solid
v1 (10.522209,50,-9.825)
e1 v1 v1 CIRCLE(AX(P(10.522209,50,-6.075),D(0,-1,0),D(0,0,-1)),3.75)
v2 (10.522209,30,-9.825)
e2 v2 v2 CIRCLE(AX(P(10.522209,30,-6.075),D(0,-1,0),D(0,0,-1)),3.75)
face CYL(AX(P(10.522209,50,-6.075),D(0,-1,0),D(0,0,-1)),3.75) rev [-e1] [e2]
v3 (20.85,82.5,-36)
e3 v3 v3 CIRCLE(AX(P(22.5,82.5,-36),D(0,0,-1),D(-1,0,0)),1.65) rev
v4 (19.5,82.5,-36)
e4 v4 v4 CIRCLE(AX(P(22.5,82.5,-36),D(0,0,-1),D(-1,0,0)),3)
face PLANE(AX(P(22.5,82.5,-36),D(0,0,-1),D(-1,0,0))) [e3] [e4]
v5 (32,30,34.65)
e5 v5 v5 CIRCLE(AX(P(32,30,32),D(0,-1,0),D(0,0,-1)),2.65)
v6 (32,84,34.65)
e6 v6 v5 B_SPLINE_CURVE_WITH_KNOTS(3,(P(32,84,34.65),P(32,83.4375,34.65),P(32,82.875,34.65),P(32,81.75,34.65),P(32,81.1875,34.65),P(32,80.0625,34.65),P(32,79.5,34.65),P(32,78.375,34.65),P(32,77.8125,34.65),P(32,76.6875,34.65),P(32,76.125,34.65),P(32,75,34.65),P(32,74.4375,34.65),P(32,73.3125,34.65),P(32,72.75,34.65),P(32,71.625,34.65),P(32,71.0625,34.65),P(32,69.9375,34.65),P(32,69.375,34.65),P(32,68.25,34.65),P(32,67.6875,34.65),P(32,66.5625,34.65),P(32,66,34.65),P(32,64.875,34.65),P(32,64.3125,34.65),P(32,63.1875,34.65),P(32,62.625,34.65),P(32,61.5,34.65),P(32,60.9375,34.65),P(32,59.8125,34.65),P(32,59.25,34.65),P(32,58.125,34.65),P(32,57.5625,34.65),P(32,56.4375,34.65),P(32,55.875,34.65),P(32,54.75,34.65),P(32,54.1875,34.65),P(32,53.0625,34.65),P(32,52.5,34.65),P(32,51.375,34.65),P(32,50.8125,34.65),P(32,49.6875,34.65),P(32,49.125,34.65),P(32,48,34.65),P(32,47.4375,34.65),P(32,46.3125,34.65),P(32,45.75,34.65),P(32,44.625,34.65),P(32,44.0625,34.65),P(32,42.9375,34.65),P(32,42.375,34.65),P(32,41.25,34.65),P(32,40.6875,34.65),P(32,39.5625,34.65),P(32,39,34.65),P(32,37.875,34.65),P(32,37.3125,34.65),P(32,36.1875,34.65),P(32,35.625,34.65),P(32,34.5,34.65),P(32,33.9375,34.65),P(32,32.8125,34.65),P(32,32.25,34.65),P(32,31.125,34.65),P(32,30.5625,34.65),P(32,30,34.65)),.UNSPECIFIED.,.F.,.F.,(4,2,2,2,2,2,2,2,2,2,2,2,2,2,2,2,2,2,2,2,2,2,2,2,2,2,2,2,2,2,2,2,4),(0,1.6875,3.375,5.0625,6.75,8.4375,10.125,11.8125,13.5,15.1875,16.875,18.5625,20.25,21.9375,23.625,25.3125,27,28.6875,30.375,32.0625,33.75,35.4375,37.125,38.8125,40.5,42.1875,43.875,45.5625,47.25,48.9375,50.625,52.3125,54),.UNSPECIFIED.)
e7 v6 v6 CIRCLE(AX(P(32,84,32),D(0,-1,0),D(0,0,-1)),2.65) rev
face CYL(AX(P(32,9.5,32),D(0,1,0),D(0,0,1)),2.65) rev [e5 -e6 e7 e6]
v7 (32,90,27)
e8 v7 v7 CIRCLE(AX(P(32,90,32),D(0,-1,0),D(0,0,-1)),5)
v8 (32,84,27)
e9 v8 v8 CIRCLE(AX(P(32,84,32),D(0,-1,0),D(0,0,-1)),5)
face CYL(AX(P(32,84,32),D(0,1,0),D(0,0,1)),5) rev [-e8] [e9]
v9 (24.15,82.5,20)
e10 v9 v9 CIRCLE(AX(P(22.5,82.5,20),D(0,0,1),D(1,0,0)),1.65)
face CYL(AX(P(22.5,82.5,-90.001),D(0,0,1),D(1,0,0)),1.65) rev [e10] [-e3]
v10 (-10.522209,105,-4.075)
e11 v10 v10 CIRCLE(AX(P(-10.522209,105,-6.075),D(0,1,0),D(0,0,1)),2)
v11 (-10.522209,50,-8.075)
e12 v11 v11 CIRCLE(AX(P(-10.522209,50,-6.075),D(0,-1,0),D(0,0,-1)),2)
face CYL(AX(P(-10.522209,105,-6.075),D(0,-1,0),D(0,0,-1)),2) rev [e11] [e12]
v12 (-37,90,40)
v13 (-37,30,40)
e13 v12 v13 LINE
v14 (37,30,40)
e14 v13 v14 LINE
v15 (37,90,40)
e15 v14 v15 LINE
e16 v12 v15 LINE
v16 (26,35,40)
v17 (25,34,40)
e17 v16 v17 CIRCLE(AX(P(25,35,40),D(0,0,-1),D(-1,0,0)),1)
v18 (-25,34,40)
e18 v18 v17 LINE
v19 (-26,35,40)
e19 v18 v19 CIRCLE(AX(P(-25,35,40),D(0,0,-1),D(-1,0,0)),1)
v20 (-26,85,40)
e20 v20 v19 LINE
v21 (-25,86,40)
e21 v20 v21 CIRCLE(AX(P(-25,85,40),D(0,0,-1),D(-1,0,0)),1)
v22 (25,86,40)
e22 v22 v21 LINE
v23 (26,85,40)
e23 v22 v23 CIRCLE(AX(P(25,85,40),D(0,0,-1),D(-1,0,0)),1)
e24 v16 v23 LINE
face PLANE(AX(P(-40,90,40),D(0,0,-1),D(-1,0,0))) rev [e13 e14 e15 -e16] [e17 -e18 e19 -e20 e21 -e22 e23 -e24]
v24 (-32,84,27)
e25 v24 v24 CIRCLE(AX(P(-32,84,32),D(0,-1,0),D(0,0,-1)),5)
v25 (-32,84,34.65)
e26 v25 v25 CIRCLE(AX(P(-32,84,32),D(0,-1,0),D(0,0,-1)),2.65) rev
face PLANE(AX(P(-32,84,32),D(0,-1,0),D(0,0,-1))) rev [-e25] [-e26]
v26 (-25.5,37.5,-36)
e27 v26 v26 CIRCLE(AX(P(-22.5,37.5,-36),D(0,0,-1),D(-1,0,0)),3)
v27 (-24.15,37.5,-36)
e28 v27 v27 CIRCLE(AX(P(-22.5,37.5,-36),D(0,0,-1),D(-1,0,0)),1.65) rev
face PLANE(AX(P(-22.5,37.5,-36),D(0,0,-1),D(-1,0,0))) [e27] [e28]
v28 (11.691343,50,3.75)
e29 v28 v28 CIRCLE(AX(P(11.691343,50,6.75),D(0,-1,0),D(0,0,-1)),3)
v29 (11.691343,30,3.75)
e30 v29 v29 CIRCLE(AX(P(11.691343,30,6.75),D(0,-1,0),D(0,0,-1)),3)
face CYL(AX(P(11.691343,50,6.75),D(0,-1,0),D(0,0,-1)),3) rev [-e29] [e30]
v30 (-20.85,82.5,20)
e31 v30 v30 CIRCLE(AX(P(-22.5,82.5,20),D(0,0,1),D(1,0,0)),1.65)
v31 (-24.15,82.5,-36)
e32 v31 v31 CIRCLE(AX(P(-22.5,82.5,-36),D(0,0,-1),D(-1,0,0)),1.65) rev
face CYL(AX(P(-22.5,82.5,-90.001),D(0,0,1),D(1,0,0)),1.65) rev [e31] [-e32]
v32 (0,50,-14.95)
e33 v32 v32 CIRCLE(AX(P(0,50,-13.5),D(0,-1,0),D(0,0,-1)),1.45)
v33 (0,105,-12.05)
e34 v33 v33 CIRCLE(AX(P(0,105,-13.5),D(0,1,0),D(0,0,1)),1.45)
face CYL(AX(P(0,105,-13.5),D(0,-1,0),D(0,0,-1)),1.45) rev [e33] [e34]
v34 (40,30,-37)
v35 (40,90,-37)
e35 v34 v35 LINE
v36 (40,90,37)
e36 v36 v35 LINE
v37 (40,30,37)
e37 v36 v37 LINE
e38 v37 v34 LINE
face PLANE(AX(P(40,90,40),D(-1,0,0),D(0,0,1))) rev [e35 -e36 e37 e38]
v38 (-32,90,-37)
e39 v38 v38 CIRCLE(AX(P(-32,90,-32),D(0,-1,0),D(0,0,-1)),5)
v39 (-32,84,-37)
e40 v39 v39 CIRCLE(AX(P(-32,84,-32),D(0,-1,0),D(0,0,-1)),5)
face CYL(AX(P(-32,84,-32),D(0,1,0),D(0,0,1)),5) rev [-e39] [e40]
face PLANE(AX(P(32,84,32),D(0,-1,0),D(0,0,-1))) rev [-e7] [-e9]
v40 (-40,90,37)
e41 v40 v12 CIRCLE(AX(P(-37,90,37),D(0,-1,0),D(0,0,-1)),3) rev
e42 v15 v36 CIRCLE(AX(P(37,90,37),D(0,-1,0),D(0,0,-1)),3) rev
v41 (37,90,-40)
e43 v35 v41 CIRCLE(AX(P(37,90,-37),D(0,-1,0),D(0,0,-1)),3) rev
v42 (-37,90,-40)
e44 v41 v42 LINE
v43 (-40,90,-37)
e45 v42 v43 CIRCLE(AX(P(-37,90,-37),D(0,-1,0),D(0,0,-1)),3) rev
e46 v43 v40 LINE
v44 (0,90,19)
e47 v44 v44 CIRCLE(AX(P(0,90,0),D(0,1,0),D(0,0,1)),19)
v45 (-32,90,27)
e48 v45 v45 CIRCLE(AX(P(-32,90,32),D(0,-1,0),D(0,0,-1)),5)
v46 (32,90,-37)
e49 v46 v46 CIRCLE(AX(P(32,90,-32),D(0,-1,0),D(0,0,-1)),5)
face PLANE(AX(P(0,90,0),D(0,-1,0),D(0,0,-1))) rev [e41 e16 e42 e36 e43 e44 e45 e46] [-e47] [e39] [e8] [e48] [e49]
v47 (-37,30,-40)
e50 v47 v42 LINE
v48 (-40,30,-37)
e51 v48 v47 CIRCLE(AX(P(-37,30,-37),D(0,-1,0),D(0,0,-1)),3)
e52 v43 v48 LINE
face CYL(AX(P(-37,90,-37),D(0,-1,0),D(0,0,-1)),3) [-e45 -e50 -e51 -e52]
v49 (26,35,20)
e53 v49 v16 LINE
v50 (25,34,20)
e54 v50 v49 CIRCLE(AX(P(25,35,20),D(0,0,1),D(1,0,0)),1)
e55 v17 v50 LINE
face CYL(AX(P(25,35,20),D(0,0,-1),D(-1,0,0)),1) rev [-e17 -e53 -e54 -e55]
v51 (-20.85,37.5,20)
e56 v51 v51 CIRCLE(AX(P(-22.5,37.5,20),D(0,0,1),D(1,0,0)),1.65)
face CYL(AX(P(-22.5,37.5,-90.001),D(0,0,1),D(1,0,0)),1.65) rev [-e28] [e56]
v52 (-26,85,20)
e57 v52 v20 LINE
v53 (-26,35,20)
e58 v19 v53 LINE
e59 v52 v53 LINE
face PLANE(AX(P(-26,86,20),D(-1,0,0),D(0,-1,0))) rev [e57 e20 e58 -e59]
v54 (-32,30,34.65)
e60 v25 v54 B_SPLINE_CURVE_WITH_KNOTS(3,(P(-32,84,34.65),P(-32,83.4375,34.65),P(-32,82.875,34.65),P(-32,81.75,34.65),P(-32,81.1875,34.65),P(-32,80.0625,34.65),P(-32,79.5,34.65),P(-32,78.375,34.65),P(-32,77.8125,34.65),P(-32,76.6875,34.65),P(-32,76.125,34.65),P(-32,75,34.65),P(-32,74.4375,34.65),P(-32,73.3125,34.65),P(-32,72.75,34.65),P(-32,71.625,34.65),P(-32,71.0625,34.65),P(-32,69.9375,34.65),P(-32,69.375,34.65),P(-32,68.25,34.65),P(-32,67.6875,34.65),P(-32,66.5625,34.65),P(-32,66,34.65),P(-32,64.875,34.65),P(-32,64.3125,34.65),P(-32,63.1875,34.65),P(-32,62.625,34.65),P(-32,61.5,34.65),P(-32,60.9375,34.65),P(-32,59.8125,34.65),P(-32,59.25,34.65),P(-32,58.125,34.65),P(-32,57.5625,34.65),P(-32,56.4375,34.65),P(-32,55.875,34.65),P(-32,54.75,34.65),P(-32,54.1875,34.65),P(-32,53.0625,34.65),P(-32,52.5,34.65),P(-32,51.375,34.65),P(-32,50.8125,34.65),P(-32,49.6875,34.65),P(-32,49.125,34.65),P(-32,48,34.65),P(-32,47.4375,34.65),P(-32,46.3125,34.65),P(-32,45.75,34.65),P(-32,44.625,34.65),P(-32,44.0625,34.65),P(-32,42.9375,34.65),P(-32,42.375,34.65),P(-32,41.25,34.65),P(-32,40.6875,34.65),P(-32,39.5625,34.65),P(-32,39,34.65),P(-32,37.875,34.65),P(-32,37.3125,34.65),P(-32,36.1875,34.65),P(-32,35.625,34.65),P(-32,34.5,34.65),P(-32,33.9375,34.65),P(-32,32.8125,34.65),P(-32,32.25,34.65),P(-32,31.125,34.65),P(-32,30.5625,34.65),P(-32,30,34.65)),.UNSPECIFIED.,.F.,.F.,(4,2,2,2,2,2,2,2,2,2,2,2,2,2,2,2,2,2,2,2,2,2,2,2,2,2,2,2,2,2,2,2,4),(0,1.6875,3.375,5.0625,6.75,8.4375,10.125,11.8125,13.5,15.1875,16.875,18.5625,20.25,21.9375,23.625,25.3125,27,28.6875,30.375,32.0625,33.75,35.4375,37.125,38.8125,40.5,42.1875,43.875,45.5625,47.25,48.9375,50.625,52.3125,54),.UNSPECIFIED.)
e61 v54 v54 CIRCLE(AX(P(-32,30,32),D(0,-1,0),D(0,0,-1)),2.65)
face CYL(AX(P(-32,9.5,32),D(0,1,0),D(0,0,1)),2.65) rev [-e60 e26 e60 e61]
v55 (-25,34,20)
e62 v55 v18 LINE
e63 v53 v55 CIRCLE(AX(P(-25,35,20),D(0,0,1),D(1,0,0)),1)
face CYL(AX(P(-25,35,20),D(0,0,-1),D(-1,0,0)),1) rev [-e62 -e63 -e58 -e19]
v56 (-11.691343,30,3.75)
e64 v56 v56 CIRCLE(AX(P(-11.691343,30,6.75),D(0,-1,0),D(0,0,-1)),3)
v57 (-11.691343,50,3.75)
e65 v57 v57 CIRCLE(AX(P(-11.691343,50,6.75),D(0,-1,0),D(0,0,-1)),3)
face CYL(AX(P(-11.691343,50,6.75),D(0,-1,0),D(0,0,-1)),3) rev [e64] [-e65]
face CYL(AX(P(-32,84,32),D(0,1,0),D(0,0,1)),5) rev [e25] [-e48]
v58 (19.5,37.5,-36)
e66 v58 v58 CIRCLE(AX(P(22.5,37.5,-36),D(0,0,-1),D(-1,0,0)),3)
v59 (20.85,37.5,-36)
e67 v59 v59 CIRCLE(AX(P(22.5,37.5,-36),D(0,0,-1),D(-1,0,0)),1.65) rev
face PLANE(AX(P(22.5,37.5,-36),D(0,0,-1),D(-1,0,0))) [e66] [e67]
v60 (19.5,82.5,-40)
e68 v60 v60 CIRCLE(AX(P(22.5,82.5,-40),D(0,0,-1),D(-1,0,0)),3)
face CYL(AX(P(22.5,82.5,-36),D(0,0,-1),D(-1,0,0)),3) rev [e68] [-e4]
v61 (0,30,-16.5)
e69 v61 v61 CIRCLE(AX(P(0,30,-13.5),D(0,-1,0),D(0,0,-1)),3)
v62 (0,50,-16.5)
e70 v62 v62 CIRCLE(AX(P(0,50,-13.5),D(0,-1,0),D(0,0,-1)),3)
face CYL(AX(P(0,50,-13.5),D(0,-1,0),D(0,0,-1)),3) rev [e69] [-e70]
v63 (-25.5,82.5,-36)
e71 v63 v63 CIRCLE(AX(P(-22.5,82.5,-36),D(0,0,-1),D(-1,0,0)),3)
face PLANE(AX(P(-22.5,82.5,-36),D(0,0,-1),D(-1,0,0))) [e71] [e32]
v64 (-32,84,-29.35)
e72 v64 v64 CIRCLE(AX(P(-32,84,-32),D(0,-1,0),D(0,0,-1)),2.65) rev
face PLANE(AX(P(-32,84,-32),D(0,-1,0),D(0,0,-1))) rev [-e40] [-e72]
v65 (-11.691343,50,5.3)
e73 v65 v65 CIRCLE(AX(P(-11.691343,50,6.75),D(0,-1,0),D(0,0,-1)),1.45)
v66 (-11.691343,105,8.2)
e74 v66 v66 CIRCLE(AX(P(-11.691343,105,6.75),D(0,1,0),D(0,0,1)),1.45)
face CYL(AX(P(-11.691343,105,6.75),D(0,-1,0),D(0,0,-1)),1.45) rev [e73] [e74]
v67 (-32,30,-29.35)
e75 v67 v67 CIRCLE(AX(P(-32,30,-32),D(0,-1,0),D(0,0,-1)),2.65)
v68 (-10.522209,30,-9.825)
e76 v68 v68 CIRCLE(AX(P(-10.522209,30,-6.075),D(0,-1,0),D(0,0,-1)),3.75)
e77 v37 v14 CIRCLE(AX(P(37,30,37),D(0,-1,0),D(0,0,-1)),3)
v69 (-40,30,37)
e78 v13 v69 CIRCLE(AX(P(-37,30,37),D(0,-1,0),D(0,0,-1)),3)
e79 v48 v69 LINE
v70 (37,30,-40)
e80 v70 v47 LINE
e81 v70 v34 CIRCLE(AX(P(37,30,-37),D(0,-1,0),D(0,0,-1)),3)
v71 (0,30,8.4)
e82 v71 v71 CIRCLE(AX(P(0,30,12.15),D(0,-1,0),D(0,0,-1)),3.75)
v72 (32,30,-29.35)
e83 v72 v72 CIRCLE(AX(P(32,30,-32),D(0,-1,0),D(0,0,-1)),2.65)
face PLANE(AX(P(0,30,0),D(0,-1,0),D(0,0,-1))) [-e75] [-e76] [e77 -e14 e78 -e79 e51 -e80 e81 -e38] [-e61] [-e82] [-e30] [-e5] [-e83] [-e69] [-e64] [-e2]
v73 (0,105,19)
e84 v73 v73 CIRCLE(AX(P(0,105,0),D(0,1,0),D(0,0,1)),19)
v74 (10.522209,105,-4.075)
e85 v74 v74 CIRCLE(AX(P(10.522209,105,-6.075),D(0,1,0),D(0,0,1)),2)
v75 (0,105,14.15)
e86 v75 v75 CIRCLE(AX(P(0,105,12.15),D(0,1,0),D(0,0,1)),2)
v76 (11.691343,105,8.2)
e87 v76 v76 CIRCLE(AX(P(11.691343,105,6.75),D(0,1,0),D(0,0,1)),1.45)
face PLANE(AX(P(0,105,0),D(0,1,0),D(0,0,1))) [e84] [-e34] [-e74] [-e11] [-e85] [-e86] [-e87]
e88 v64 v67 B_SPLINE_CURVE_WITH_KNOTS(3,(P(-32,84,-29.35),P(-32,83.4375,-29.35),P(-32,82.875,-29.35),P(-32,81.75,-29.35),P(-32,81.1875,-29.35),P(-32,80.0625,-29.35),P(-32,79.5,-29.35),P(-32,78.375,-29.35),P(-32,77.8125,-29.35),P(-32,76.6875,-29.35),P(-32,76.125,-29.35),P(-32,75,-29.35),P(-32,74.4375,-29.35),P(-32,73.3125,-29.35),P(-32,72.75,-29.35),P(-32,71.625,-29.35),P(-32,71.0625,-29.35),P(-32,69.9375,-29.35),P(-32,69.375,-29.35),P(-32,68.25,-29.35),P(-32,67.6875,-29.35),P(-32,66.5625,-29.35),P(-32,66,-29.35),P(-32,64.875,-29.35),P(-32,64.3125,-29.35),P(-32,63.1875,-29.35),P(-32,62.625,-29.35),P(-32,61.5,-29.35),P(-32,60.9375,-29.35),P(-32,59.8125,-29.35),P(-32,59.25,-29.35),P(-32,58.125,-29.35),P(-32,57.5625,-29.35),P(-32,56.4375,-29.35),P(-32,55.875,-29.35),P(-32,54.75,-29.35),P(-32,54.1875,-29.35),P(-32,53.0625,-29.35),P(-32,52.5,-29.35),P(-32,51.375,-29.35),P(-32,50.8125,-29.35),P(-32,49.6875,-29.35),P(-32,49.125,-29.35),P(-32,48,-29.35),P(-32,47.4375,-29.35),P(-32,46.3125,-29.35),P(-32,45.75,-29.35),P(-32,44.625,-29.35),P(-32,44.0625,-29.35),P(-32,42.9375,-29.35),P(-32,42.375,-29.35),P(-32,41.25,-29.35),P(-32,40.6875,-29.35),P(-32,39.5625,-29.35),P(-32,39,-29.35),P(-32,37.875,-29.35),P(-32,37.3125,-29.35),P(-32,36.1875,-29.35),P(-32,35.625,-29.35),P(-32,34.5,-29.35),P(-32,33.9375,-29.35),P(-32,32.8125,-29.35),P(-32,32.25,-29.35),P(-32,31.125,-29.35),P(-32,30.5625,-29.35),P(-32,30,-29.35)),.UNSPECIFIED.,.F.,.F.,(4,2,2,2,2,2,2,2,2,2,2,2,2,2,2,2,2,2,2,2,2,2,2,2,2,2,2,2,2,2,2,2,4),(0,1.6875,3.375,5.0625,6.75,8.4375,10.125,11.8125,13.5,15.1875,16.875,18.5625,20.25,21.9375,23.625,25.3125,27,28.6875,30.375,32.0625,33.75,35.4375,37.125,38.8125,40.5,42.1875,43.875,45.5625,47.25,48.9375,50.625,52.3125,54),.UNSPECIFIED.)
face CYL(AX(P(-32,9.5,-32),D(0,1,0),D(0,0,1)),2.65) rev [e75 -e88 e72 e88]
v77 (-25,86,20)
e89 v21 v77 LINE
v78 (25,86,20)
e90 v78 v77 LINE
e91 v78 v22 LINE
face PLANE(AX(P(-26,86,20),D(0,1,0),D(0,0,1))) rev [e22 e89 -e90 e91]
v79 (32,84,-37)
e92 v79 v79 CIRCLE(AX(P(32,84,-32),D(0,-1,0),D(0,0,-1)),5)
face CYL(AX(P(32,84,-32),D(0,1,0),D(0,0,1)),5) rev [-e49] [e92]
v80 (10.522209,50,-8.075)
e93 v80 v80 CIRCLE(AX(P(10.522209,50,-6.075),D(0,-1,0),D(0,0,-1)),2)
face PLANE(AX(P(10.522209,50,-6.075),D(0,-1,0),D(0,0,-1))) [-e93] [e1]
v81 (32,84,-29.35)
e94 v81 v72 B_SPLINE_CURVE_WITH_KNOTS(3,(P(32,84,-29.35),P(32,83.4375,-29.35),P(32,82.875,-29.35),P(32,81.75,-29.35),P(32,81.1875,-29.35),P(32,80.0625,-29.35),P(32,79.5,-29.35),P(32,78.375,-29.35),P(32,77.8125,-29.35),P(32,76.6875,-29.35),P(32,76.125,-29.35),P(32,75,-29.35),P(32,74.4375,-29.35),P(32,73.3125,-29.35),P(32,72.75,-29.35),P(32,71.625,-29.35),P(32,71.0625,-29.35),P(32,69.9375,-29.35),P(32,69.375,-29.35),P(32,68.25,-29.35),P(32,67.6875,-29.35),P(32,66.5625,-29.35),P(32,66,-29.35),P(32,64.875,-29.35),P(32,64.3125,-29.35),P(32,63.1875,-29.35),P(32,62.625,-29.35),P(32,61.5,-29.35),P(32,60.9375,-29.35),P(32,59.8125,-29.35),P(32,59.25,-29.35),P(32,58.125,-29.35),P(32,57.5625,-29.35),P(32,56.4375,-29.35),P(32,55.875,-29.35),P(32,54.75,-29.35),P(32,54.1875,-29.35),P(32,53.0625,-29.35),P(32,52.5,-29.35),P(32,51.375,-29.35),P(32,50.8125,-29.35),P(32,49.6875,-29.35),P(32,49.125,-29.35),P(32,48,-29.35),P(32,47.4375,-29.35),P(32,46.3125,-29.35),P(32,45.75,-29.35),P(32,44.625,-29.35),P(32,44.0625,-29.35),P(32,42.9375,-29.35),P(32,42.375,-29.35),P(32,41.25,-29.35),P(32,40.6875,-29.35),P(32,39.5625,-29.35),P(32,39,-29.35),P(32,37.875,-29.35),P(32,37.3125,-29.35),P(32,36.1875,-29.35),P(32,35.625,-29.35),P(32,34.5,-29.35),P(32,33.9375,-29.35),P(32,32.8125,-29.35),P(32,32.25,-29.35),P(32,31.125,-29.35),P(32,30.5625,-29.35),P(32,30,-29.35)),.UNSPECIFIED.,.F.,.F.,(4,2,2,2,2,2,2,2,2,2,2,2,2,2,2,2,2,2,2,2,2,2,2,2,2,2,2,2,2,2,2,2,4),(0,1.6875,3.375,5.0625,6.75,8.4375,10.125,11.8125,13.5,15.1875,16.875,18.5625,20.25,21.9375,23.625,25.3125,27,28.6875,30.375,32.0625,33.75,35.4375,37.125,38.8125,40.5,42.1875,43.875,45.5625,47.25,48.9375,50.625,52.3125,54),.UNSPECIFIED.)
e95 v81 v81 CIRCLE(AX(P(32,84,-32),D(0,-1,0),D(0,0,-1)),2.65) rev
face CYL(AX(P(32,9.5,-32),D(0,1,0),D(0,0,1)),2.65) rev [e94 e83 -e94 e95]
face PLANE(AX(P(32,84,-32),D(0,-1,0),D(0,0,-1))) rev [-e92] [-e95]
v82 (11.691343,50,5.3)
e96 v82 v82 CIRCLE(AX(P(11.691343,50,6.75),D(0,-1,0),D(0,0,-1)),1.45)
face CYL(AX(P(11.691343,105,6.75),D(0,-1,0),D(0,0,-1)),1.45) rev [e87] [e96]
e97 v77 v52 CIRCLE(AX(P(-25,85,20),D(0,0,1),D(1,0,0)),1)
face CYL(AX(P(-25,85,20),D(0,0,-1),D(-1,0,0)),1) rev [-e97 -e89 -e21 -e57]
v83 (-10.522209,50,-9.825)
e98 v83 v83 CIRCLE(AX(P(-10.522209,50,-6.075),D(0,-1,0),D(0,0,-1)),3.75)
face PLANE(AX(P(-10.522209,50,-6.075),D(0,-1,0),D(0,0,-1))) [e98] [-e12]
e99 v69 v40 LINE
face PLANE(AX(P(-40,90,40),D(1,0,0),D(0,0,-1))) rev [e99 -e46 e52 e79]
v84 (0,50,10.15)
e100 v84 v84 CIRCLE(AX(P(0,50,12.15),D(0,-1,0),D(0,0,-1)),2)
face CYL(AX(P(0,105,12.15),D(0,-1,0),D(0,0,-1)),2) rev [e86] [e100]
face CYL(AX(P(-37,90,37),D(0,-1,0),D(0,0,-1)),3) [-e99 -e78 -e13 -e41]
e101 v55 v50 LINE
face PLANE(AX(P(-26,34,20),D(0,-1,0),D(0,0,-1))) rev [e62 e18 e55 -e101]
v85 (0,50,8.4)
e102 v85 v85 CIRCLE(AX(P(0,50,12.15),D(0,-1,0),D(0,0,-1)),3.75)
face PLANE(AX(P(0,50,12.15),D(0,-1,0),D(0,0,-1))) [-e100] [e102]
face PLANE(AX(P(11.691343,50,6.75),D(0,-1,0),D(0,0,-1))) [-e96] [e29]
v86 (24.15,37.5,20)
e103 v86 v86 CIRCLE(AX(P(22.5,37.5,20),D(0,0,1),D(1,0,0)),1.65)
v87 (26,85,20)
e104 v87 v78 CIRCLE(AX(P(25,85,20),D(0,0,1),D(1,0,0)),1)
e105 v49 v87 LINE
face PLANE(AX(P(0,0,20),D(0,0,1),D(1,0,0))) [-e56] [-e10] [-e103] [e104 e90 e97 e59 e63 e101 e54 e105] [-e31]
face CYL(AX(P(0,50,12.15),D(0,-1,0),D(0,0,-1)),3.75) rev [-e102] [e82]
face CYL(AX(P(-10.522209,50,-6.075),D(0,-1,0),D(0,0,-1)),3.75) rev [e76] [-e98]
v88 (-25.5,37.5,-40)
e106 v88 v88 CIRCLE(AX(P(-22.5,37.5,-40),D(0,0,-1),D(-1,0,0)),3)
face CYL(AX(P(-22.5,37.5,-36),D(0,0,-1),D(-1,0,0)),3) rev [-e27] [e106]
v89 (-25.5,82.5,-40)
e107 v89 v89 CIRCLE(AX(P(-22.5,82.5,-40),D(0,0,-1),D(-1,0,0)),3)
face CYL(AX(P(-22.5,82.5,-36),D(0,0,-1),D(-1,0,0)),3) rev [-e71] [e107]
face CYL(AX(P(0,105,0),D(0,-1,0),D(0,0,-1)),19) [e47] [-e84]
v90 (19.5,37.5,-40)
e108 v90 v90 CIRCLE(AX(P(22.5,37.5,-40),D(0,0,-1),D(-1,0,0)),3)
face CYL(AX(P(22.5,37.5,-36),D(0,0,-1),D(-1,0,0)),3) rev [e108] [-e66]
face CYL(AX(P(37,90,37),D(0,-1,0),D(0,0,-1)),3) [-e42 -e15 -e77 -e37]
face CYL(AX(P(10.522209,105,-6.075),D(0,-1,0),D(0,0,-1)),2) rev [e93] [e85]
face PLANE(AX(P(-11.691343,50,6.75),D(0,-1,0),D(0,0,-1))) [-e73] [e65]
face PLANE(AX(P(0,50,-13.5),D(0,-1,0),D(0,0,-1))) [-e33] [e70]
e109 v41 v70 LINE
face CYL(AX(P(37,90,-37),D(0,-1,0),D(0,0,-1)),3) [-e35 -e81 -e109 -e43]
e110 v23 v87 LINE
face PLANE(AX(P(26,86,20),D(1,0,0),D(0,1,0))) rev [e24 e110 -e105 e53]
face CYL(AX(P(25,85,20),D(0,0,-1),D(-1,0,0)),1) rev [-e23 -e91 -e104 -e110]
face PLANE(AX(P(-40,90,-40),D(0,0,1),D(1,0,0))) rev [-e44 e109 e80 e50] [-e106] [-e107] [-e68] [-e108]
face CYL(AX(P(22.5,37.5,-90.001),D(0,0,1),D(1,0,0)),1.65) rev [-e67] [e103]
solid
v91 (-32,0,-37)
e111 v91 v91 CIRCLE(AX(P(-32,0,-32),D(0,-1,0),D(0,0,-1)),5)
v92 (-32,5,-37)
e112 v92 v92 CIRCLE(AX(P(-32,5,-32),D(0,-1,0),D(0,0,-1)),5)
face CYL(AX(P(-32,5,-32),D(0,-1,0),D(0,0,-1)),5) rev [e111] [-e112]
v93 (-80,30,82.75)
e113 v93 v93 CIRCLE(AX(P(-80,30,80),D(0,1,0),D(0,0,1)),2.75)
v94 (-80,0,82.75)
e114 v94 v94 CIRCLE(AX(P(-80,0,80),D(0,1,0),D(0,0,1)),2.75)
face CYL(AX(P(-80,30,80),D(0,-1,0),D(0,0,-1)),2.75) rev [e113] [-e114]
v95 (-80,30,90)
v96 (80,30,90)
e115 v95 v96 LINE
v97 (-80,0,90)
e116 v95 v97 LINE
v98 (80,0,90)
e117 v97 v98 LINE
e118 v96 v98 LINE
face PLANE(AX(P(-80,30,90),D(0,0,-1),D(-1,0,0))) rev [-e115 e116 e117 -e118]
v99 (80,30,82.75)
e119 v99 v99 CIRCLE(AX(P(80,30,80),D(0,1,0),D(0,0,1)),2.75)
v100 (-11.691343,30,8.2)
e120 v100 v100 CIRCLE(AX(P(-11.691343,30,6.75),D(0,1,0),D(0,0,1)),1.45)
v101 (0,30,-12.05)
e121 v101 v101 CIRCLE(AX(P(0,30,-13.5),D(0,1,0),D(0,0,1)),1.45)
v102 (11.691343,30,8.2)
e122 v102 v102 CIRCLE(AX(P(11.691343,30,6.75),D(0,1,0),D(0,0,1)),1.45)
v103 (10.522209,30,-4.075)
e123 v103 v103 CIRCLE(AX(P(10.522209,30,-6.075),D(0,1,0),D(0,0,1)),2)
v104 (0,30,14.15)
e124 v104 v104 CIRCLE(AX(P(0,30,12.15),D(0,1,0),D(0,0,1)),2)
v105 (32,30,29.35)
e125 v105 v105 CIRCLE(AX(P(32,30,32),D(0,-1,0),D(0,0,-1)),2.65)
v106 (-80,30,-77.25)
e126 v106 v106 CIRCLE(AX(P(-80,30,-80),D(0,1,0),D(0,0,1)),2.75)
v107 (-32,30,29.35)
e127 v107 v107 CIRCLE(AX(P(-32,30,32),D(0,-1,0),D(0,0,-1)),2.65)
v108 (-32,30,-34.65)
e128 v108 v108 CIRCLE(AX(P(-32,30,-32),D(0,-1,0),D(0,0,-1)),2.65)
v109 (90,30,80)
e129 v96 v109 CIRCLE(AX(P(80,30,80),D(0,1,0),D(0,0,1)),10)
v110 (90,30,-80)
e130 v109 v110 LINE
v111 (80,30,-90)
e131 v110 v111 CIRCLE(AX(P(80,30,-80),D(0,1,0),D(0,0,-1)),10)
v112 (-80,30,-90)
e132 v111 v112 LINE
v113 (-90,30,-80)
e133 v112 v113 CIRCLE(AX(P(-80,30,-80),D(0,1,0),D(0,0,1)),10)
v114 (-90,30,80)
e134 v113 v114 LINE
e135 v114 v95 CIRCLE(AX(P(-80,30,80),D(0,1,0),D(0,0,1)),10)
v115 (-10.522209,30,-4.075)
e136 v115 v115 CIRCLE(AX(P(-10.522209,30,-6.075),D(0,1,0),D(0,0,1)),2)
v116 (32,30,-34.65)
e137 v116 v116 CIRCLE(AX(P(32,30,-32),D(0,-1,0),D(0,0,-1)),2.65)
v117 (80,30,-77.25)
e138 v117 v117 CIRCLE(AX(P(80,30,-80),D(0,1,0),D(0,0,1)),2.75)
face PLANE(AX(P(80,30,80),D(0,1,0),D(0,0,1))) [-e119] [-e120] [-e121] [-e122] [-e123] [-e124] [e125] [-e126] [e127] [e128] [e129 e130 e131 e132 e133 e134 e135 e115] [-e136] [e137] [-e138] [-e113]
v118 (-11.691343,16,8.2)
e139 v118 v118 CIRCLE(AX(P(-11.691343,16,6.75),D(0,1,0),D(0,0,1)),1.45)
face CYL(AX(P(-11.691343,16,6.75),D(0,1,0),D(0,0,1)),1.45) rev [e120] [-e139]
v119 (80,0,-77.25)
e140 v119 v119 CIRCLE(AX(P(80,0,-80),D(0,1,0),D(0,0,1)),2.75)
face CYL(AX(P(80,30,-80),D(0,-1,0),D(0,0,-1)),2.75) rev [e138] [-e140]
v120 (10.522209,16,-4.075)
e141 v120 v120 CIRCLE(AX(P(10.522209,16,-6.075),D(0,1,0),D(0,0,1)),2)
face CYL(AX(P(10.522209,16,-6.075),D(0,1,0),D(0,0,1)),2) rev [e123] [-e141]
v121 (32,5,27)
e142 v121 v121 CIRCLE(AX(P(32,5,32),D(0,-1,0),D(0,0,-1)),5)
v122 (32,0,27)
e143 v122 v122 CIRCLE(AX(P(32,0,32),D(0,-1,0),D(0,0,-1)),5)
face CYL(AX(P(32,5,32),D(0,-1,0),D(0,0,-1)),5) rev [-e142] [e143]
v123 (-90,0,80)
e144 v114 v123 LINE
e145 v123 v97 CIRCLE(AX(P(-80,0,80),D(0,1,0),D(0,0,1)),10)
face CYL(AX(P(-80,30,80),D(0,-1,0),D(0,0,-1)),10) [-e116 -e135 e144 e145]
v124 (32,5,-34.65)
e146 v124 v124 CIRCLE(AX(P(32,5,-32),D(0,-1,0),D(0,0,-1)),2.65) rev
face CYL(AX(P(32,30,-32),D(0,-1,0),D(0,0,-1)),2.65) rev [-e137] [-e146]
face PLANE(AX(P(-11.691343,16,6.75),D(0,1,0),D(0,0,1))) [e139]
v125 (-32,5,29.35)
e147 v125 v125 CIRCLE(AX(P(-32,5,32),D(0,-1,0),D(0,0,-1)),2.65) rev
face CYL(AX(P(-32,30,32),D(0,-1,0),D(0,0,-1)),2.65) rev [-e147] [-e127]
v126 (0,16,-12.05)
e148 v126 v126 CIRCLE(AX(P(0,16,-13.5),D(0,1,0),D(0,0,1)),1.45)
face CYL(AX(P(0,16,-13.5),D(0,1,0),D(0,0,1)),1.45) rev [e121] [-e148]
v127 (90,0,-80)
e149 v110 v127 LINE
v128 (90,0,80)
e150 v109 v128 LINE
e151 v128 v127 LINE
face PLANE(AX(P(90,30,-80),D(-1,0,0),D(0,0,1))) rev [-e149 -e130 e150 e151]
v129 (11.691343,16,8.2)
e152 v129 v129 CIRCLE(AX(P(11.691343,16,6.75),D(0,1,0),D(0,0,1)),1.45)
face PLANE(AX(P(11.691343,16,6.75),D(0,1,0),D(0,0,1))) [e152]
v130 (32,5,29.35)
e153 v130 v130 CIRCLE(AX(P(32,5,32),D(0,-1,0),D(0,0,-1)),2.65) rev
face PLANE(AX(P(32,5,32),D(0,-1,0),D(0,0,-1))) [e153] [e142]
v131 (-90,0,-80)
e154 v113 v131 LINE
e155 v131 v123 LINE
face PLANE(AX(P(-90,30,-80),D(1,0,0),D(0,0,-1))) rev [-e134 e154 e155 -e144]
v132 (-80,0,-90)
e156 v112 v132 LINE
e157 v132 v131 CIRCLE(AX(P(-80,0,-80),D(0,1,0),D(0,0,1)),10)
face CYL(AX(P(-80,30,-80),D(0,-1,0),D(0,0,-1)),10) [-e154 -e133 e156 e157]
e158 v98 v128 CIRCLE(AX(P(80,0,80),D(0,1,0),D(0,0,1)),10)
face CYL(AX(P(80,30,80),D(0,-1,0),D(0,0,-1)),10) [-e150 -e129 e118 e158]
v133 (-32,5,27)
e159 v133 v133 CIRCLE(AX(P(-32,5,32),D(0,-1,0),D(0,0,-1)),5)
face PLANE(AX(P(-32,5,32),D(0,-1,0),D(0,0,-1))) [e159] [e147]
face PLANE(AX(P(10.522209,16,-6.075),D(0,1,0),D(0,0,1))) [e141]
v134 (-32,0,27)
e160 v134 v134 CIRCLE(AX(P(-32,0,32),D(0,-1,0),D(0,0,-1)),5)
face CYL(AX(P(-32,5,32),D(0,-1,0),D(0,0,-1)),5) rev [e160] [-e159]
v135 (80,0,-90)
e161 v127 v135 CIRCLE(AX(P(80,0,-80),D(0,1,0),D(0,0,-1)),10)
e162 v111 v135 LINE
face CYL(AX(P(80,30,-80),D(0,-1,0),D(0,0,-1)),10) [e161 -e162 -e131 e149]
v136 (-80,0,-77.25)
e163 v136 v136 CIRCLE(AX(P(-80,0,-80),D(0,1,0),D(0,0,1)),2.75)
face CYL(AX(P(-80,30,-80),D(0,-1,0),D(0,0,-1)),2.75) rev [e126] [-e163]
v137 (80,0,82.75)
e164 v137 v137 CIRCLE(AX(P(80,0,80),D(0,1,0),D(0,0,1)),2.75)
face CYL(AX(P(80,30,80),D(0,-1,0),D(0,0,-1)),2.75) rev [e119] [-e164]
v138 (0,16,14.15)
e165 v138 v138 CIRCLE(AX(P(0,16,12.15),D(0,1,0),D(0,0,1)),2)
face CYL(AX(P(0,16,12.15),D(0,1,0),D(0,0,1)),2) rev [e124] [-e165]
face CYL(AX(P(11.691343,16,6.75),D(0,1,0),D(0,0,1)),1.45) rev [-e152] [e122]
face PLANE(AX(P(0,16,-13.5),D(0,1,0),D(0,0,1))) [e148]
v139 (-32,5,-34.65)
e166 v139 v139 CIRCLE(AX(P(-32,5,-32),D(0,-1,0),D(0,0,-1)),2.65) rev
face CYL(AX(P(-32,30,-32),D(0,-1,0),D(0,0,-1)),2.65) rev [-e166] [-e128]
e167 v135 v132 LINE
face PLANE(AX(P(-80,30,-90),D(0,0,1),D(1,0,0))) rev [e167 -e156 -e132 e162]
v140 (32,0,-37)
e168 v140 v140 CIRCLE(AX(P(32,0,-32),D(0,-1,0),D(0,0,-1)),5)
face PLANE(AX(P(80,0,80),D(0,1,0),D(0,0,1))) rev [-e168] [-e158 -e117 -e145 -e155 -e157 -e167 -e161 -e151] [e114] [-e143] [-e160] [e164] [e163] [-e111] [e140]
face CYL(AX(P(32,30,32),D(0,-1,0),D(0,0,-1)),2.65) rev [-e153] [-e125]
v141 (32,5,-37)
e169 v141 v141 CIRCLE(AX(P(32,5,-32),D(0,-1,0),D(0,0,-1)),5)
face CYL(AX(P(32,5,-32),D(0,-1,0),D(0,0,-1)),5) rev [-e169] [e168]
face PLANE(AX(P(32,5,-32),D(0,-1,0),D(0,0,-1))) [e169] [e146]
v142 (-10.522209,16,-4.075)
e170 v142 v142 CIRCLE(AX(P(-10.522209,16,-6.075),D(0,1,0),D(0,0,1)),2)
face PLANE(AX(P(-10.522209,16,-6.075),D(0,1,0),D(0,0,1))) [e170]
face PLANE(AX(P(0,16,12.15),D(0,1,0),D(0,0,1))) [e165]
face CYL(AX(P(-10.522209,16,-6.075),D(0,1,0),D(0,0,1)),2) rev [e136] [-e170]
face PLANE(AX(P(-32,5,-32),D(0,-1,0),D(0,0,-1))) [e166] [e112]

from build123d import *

# Parameters (mm, degrees)
SKETCH_1_R            = 2.75
EXTRUDE_1_DEPTH       = 30
SKETCH_2_W            = 80
SKETCH_2_H            = 80
EXTRUDE_2_DEPTH       = 60
EXTRUDE_3_OUTLINE_R   = 19
EXTRUDE_3_OUTLINE_R_2 = 1.45
EXTRUDE_3_OUTLINE_R_3 = 2
EXTRUDE_3_DEPTH       = 15
SKETCH_4_R            = 1.45
SKETCH_4_R_2          = 2
CUT_EXTRUDE_1_DEPTH   = 89
FILLET_1_R            = 3
SKETCH_6_W            = 52
SKETCH_6_H            = 52
CUT_EXTRUDE_3_DEPTH   = 20
CUT_EXTRUDE_START     = -30
SKETCH_5_R            = 3.75
SKETCH_5_R_2          = 3
CUT_EXTRUDE_4_DEPTH   = 20
SKETCH_7_R            = 2.65
CUT_EXTRUDE_5_DEPTH   = 80.5
CUT_EXTRUDE_START_2   = -60
SKETCH_8_R            = 5
CUT_EXTRUDE_7_DEPTH   = 6
FILLET_3_R            = 1
SKETCH_9_R            = 1.65
CUT_EXTRUDE_8_DEPTH   = 60
SKETCH_10_R           = 3
CUT_EXTRUDE_9_DEPTH   = 4
SKETCH_11_R           = 2.65
CUT_EXTRUDE_10_DEPTH  = 30
SKETCH_12_R           = 5
CUT_EXTRUDE_11_DEPTH  = 5


# Read off the part's stored shape, not the designer's step: 凸台-拉伸3
with BuildPart() as part:
    # 草图1 → 凸台-拉伸1 (new body)
    with BuildSketch(Plane(origin=(0, 0, 0), x_dir=(1, 0, 0), z_dir=(0, 1, 0))):
        with BuildLine():
            Line((-80, 90), (80, 90))
            ThreePointArc((80, 90), (87.071067812, 87.071067812), (90, 80))
            Line((90, 80), (90, -80))
            ThreePointArc((90, -80), (87.071067812, -87.071067812), (80, -90))
            Line((80, -90), (-80, -90))
            ThreePointArc((-80, -90), (-87.071067812, -87.071067812), (-90, -80))
            Line((-90, -80), (-90, 80))
            ThreePointArc((-90, 80), (-87.071067812, 87.071067812), (-80, 90))
        make_face()
        with Locations(Location((-80, 80, 0), (0, 0, 270))):
            Circle(SKETCH_1_R, mode=Mode.SUBTRACT)
        with Locations(Location((-80, -80, 0), (0, 0, 270))):
            Circle(SKETCH_1_R, mode=Mode.SUBTRACT)
        with Locations(Location((80, 80, 0), (0, 0, 270))):
            Circle(SKETCH_1_R, mode=Mode.SUBTRACT)
        with Locations(Location((80, -80, 0), (0, 0, 270))):
            Circle(SKETCH_1_R, mode=Mode.SUBTRACT)
    extrude(amount=EXTRUDE_1_DEPTH)


with BuildPart() as body_2:
    # 草图2 → 凸台-拉伸2 (new body)
    with BuildSketch(Plane(origin=(0, 30, 0), x_dir=(1, 0, 0), z_dir=(0, 1, 0))):
        Rectangle(SKETCH_2_W, SKETCH_2_H)
    extrude(amount=EXTRUDE_2_DEPTH)

    # 凸台-拉伸3 outline → 凸台-拉伸3 (add)
    with BuildSketch(Plane(origin=(0, 90, 0), x_dir=(1, 0, 0), z_dir=(0, 1, 0))):
        Circle(EXTRUDE_3_OUTLINE_R)
        with Locations((-11.691342951, -6.75)):
            Circle(EXTRUDE_3_OUTLINE_R_2, mode=Mode.SUBTRACT)
        with Locations((0, -12.15)):
            Circle(EXTRUDE_3_OUTLINE_R_3, mode=Mode.SUBTRACT)
        with Locations((11.691342951, -6.75)):
            Circle(EXTRUDE_3_OUTLINE_R_2, mode=Mode.SUBTRACT)
        with Locations((-10.522208656, 6.075)):
            Circle(EXTRUDE_3_OUTLINE_R_3, mode=Mode.SUBTRACT)
        with Locations((10.522208656, 6.075)):
            Circle(EXTRUDE_3_OUTLINE_R_3, mode=Mode.SUBTRACT)
        with Locations((0, 13.5)):
            Circle(EXTRUDE_3_OUTLINE_R_2, mode=Mode.SUBTRACT)
    extrude(amount=EXTRUDE_3_DEPTH)


with BuildPart() as cut_extrude_1_tool:
    # 草图4 → 切除-拉伸1 (new body)
    with BuildSketch(Plane(origin=(0, 105, 0), x_dir=(1, 0, 0), z_dir=(0, 1, 0))):
        with Locations(Location((-11.691342951, -6.75, 0), (0, 0, 90))):
            Circle(SKETCH_4_R)
        with Locations(Location((0, -12.15, 0), (0, 0, 90))):
            Circle(SKETCH_4_R_2)
        with Locations(Location((11.691342951, -6.75, 0), (0, 0, 90))):
            Circle(SKETCH_4_R)
        with Locations(Location((10.522208656, 6.075, 0), (0, 0, 90))):
            Circle(SKETCH_4_R_2)
        with Locations(Location((-10.522208656, 6.075, 0), (0, 0, 90))):
            Circle(SKETCH_4_R_2)
        with Locations(Location((0, 13.5, 0), (0, 0, 90))):
            Circle(SKETCH_4_R)
    extrude(amount=-CUT_EXTRUDE_1_DEPTH)


with BuildPart() as part_1:
    add(part.part)

    # 切除-拉伸1: cut by cut_extrude_1_tool
    add(cut_extrude_1_tool.part, mode=Mode.SUBTRACT)

    # 草图11 → 切除-拉伸10 (cut)
    with BuildSketch(Plane.XZ):
        with Locations(Location((32, 32, 0), (0, 0, 90))):
            Circle(SKETCH_11_R)
        with Locations(Location((32, -32, 0), (0, 0, 90))):
            Circle(SKETCH_11_R)
        with Locations(Location((-32, -32, 0), (0, 0, 90))):
            Circle(SKETCH_11_R)
        with Locations(Location((-32, 32, 0), (0, 0, 90))):
            Circle(SKETCH_11_R)
    extrude(amount=-CUT_EXTRUDE_10_DEPTH, mode=Mode.SUBTRACT)

    # 草图12 → 切除-拉伸11 (cut)
    with BuildSketch(Plane.XZ):
        with Locations(Location((32, 32, 0), (0, 0, 270))):
            Circle(SKETCH_12_R)
        with Locations(Location((32, -32, 0), (0, 0, 270))):
            Circle(SKETCH_12_R)
        with Locations(Location((-32, -32, 0), (0, 0, 270))):
            Circle(SKETCH_12_R)
        with Locations(Location((-32, 32, 0), (0, 0, 270))):
            Circle(SKETCH_12_R)
    extrude(amount=-CUT_EXTRUDE_11_DEPTH, mode=Mode.SUBTRACT)


with BuildPart() as body_2_1:
    add(body_2.part)

    # 切除-拉伸1: cut by cut_extrude_1_tool
    add(cut_extrude_1_tool.part, mode=Mode.SUBTRACT)

    # 圆角1
    fillet_1_edges = [body_2_1.edges().sort_by_distance(p)[0] for p in [
        (40, 60, 40),
        (-40, 60, 40),
        (-40, 60, -40),
        (40, 60, -40),
    ]]
    fillet(fillet_1_edges, radius=FILLET_1_R)

    # 草图6 → 切除-拉伸3 (cut)
    with BuildSketch(Plane.XY.offset(40)):
        with Locations((0, 60)):
            Rectangle(SKETCH_6_W, SKETCH_6_H)
    extrude(amount=-CUT_EXTRUDE_3_DEPTH, mode=Mode.SUBTRACT)

    # 草图5 → 切除-拉伸4 (cut)
    with BuildSketch(Plane.XZ.offset(CUT_EXTRUDE_START)):
        with Locations(Location((0, 12.15, 0), (0, 0, 270))):
            Circle(SKETCH_5_R)
        with Locations(Location((10.522208656, -6.075, 0), (0, 0, 270))):
            Circle(SKETCH_5_R)
        with Locations(Location((-10.522208656, -6.075, 0), (0, 0, 270))):
            Circle(SKETCH_5_R)
        with Locations(Location((-11.691342951, 6.75, 0), (0, 0, 270))):
            Circle(SKETCH_5_R_2)
        with Locations(Location((11.691342951, 6.75, 0), (0, 0, 270))):
            Circle(SKETCH_5_R_2)
        with Locations(Location((0, -13.5, 0), (0, 0, 270))):
            Circle(SKETCH_5_R_2)
    extrude(amount=-CUT_EXTRUDE_4_DEPTH, mode=Mode.SUBTRACT)

    # 草图7 → 切除-拉伸5 (cut)
    with BuildSketch(Plane(origin=(0, 90, 0), x_dir=(1, 0, 0), z_dir=(0, 1, 0))):
        with Locations(Location((32, 32, 0), (0, 0, 270))):
            Circle(SKETCH_7_R)
        with Locations(Location((-32, 32, 0), (0, 0, 270))):
            Circle(SKETCH_7_R)
        with Locations(Location((-32, -32, 0), (0, 0, 270))):
            Circle(SKETCH_7_R)
        with Locations(Location((32, -32, 0), (0, 0, 270))):
            Circle(SKETCH_7_R)
    extrude(amount=-CUT_EXTRUDE_5_DEPTH, mode=Mode.SUBTRACT)

    # 草图8 → 切除-拉伸7 (cut)
    with BuildSketch(Plane.XZ.offset(-30).offset(CUT_EXTRUDE_START_2)):
        with Locations(Location((32, 32, 0), (0, 0, 270))):
            Circle(SKETCH_8_R)
        with Locations(Location((-32, 32, 0), (0, 0, 270))):
            Circle(SKETCH_8_R)
        with Locations(Location((-32, -32, 0), (0, 0, 270))):
            Circle(SKETCH_8_R)
        with Locations(Location((32, -32, 0), (0, 0, 270))):
            Circle(SKETCH_8_R)
    extrude(amount=CUT_EXTRUDE_7_DEPTH, mode=Mode.SUBTRACT)

    # 圆角3
    fillet_3_edges = [body_2_1.edges().sort_by_distance(p)[0] for p in [
        (-26, 34, 30),
        (-26, 86, 30),
        (26, 86, 30),
        (26, 34, 30),
    ]]
    fillet(fillet_3_edges, radius=FILLET_3_R)

    # 草图9 → 切除-拉伸8 (cut)
    with BuildSketch(Plane.XY.offset(20)):
        with Locations((-22.5, 82.5)):
            Circle(SKETCH_9_R)
        with Locations((22.5, 82.5)):
            Circle(SKETCH_9_R)
        with Locations((22.5, 37.5)):
            Circle(SKETCH_9_R)
        with Locations((-22.5, 37.5)):
            Circle(SKETCH_9_R)
    extrude(amount=-CUT_EXTRUDE_8_DEPTH, mode=Mode.SUBTRACT)

    # 草图10 → 切除-拉伸9 (cut)
    with BuildSketch(Plane(origin=(0, 0, -40), x_dir=(-1, 0, 0), z_dir=(0, 0, -1))):
        with Locations((-22.5, 82.5)):
            Circle(SKETCH_10_R)
        with Locations((22.5, 82.5)):
            Circle(SKETCH_10_R)
        with Locations((22.5, 37.5)):
            Circle(SKETCH_10_R)
        with Locations((-22.5, 37.5)):
            Circle(SKETCH_10_R)
    extrude(amount=-CUT_EXTRUDE_9_DEPTH, mode=Mode.SUBTRACT)


solid = Compound([part_1.part, body_2_1.part])
